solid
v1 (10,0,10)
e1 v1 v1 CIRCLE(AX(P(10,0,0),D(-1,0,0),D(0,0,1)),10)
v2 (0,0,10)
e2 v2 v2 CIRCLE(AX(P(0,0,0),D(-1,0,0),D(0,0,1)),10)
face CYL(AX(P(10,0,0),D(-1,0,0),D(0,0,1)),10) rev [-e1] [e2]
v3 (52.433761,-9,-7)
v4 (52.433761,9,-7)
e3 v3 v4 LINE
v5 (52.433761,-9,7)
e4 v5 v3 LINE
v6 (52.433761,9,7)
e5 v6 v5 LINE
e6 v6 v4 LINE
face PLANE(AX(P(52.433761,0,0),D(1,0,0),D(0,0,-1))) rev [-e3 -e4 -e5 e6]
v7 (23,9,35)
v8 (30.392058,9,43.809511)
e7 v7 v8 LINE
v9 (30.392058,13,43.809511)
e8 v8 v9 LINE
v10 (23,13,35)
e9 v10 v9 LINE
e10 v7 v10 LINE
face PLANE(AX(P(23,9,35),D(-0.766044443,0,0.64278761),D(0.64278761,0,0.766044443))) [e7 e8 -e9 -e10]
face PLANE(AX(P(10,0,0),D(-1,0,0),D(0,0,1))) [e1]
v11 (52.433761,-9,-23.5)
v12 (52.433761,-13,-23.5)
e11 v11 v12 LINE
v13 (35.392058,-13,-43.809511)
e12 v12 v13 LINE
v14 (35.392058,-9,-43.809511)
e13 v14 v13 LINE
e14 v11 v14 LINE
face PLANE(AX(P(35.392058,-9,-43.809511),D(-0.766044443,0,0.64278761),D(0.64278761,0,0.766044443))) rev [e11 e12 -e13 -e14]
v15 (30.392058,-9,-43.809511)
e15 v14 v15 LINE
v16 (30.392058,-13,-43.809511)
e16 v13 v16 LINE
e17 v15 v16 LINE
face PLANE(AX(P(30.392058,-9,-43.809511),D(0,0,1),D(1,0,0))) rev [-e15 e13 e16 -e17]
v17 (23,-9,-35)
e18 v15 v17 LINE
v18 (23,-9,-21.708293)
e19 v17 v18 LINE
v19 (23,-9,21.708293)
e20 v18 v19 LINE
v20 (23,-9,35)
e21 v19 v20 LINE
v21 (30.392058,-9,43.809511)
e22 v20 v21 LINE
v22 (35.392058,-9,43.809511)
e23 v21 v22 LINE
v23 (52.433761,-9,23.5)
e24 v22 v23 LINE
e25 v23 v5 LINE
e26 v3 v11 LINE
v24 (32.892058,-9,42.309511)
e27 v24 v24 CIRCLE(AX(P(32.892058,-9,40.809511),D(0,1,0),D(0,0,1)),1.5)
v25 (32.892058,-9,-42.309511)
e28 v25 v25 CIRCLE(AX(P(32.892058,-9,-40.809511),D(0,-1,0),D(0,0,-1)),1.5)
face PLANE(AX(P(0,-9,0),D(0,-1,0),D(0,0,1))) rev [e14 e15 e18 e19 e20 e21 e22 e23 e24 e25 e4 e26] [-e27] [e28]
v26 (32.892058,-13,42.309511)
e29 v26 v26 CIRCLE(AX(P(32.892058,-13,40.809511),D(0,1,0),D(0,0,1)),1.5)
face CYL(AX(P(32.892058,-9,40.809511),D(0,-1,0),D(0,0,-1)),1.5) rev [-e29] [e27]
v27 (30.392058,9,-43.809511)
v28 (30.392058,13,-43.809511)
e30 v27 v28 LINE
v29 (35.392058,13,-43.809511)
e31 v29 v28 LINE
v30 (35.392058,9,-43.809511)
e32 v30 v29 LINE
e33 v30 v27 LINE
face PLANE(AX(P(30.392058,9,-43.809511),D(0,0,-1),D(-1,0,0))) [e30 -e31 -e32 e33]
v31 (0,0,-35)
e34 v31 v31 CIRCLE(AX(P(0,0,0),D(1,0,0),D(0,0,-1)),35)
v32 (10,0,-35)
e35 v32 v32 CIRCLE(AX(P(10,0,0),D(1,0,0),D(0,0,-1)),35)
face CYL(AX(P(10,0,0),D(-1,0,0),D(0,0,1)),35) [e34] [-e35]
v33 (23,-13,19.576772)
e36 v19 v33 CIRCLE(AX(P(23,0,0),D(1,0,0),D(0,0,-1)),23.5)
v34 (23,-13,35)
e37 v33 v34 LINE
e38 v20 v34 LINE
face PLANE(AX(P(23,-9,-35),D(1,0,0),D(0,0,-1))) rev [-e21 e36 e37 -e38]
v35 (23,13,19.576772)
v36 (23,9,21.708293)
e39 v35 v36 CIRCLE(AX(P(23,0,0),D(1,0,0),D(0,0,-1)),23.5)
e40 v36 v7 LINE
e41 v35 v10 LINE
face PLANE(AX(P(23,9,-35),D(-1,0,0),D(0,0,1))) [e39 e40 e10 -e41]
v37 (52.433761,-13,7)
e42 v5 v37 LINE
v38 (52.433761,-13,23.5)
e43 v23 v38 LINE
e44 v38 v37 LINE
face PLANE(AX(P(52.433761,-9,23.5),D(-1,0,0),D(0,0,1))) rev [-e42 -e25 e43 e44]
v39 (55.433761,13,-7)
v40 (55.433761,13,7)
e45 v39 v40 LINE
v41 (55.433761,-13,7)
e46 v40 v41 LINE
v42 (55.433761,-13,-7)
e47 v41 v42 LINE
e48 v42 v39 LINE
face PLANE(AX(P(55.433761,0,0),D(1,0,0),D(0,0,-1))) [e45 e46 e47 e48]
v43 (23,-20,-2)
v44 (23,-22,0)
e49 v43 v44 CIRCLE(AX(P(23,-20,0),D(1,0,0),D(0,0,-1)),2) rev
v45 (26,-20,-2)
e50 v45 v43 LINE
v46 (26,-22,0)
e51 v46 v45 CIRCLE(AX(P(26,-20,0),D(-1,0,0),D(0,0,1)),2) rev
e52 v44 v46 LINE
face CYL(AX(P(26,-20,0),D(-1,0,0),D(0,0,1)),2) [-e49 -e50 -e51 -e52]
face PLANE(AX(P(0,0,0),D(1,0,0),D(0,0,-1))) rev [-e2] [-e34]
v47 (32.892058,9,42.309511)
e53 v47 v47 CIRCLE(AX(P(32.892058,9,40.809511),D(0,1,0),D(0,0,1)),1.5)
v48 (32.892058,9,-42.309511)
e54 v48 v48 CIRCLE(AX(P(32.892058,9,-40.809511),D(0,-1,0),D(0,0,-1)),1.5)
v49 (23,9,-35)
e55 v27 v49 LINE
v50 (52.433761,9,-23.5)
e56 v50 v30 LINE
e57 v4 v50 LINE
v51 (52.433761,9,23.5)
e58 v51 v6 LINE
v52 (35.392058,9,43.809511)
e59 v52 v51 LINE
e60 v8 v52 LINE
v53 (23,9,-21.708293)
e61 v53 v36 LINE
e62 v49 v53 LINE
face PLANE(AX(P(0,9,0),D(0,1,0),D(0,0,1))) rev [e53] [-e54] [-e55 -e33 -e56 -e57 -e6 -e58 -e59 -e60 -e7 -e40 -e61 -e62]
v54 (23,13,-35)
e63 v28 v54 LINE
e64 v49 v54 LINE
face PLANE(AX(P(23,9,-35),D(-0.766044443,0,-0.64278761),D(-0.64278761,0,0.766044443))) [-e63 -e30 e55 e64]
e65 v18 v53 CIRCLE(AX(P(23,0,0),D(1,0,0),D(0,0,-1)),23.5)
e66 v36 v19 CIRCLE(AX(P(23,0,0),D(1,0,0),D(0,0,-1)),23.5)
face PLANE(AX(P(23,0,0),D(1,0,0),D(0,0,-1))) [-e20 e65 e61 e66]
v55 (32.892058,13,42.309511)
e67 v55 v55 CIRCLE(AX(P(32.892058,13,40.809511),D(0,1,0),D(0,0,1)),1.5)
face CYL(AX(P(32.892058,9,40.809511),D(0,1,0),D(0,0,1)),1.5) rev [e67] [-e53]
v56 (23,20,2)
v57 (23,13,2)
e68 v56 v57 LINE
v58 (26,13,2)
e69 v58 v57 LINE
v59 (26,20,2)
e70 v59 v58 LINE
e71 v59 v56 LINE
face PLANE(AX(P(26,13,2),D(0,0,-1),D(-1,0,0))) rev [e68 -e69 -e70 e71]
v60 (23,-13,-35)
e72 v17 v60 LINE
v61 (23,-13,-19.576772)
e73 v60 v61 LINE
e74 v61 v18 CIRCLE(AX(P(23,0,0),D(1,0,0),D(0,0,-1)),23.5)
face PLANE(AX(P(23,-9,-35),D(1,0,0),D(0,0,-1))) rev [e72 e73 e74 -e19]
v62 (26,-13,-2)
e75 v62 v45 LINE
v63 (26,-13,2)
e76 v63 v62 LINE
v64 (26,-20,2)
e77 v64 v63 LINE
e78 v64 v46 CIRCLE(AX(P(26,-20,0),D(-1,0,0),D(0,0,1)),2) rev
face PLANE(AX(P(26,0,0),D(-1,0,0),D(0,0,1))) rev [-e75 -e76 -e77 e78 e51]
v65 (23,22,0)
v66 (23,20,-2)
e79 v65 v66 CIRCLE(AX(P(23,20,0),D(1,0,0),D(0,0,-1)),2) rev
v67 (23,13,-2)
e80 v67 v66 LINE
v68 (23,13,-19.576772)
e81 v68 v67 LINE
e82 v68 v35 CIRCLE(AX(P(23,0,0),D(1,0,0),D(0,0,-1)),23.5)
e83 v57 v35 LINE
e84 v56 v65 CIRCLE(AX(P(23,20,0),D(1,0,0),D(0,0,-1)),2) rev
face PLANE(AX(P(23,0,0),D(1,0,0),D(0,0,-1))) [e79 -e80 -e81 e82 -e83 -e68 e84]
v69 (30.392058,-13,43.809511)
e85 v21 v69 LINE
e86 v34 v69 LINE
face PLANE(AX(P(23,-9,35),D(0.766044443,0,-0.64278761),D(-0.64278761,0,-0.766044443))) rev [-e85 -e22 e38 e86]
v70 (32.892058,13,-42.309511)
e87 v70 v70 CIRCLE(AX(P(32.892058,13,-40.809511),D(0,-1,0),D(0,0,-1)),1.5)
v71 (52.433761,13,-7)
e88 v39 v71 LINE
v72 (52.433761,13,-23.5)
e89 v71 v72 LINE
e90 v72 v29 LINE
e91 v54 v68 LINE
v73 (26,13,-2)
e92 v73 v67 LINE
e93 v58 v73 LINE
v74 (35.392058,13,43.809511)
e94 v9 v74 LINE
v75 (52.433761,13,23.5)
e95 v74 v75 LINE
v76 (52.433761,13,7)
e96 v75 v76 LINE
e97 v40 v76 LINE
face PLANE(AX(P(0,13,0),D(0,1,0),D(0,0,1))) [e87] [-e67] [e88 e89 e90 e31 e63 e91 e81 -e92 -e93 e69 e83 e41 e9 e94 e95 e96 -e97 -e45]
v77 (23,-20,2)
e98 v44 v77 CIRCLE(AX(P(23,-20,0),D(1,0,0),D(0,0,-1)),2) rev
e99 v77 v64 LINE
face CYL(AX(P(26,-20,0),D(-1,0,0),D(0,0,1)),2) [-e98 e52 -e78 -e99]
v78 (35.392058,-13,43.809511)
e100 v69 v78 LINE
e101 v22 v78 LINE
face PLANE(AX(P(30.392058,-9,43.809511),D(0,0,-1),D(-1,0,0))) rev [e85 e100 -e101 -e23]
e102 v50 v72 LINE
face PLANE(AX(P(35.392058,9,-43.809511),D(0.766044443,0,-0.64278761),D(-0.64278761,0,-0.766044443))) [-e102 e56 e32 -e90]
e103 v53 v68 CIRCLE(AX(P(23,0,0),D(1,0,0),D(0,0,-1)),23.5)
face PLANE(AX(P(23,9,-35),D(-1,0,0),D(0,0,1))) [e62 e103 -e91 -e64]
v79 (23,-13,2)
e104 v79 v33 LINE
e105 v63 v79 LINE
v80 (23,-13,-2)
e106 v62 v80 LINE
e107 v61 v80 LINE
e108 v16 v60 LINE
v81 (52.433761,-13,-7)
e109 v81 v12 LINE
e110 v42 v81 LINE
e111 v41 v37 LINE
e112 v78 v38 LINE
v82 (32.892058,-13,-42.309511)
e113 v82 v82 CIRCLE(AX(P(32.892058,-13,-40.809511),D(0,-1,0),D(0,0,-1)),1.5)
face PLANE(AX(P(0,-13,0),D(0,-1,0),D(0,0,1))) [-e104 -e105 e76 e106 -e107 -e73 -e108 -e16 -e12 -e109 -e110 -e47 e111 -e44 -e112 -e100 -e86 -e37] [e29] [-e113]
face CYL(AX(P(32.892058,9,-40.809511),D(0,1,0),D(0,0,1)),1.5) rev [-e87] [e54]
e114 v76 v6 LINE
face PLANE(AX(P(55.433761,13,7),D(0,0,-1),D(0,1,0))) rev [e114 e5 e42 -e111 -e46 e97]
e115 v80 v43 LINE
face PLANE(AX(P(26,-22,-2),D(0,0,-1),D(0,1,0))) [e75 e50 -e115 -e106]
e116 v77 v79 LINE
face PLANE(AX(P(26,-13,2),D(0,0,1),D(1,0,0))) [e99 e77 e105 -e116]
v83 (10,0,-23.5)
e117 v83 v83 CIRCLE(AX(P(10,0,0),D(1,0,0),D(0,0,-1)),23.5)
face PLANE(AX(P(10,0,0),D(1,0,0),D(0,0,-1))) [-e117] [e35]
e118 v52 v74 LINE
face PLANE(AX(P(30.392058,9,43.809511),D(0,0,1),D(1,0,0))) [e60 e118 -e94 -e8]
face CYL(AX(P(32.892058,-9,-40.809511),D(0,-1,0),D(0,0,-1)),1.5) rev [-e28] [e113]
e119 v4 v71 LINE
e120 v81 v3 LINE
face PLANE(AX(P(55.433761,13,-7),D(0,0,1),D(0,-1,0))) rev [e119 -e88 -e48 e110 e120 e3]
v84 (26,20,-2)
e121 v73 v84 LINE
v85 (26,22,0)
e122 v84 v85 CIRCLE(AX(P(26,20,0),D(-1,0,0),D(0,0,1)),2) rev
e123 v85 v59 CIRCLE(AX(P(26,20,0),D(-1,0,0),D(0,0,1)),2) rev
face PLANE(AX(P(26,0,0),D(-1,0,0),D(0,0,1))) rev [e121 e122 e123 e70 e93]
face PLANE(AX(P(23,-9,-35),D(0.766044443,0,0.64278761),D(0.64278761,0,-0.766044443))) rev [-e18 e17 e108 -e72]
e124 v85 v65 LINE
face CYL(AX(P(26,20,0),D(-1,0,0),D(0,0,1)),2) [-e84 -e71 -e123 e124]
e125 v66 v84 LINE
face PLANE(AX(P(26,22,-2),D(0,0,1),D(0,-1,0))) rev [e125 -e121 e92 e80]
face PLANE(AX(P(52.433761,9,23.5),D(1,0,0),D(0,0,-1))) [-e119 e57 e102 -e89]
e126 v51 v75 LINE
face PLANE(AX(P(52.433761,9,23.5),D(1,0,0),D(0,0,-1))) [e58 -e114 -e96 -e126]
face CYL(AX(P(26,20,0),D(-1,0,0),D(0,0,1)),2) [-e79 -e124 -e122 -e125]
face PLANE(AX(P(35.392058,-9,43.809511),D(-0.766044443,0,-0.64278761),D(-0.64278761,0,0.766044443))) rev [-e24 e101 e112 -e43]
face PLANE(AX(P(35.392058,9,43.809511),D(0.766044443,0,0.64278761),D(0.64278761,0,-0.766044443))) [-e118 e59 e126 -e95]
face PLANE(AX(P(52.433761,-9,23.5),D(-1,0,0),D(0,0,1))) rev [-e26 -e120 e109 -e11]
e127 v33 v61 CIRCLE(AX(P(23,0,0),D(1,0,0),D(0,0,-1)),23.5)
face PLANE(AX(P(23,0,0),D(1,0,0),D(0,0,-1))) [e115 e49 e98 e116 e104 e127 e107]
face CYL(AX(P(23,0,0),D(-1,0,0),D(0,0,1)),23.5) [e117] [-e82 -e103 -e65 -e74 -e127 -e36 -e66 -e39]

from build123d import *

# Parameters (mm, degrees)
SKETCH1_R               = 35
BOSS_EXTRUDE1_DEPTH     = 10
SKETCH2_R               = 23.5
BOSS_EXTRUDE2_DEPTH     = 13
BOSS_EXTRUDE3_DEPTH     = 4
SKETCH4_R               = 1.5
CUT_EXTRUDE1_DEPTH      = 4
MIRROR2_COPY_1_SKETCH_R = 1.5
MIRROR2_COPY_1_DEPTH    = 4
BOSS_EXTRUDE4_DEPTH     = 3
FILLET1_R               = 2
FILLET1_OF_MIRROR3_R    = 2
SKETCH6_W               = 14
SKETCH6_H               = 26
BOSS_EXTRUDE5_DEPTH     = 3
SKETCH7_R               = 10
CUT_EXTRUDE2_DEPTH      = 10


with BuildPart() as part:
    # Sketch1 → Boss-Extrude1 (new body)
    with BuildSketch(Plane(origin=(0, 0, 0), x_dir=(0, 0, -1), z_dir=(1, 0, 0))):
        Circle(SKETCH1_R)
    extrude(amount=BOSS_EXTRUDE1_DEPTH)

    # Sketch2 → Boss-Extrude2 (add)
    with BuildSketch(Plane(origin=(10, 0, 0), x_dir=(0, 0, -1), z_dir=(1, 0, 0))):
        with Locations(Location((0, 0, 0), (0, 0, 180))):
            Circle(SKETCH2_R)
    extrude(amount=BOSS_EXTRUDE2_DEPTH)

    # Sketch3 → Boss-Extrude3 (add)
    with BuildSketch(Plane(origin=(0, 13, 0), x_dir=(1, 0, 0), z_dir=(0, 1, 0))):
        Polygon((23, 35), (23, -35), (30.392057511, -43.809511096), (35.392057511, -43.809511096), (52.433760781, -23.5), (52.433760781, 23.5), (35.392057511, 43.809511096), (30.392057511, 43.809511096), align=None)
    boss_extrude3 = extrude(amount=-BOSS_EXTRUDE3_DEPTH)

    # Sketch4 → Cut-Extrude1 (cut)
    with BuildSketch(Plane(origin=(0, 13, 0), x_dir=(1, 0, 0), z_dir=(0, 1, 0))):
        with Locations(Location((32.892057511, -40.809511096, 0), (0, 0, 270))):
            Circle(SKETCH4_R)
    cut_extrude1 = extrude(amount=-CUT_EXTRUDE1_DEPTH, mode=Mode.SUBTRACT)

    # Mirror1: Cut-Extrude1 across plane
    add(cut_extrude1.mirror(Plane.XY), mode=Mode.SUBTRACT)

    # Mirror2: Boss-Extrude3, Cut-Extrude1 across plane
    add(boss_extrude3.mirror(Plane.ZX))
    add(cut_extrude1.mirror(Plane.ZX), mode=Mode.SUBTRACT)

    # Mirror2 copy 1 sketch → Mirror2 copy 1 (cut)
    with BuildSketch(Plane.XZ.offset(13)):
        with Locations(Location((32.892057511, -40.809511096, 0), (0, 0, 270))):
            Circle(MIRROR2_COPY_1_SKETCH_R)
    extrude(amount=-MIRROR2_COPY_1_DEPTH, mode=Mode.SUBTRACT)

    # Sketch5 → Boss-Extrude4 (add)
    with BuildSketch(Plane(origin=(23, 0, 0), x_dir=(0, 0, -1), z_dir=(1, 0, 0))):
        Polygon((0, 13), (-2, 13), (-2, 22), (2, 22), (2, 13), align=None)
    boss_extrude4 = extrude(amount=BOSS_EXTRUDE4_DEPTH)

    # Fillet1
    fillet1_edges = [part.edges().sort_by_distance(p)[0] for p in [
        (24.5, 22, 2),
        (24.5, 22, -2),
    ]]
    fillet(fillet1_edges, radius=FILLET1_R - 0.0001)  # a hair under: the kernel refuses the full size

    # Mirror3: Boss-Extrude4 across plane
    add(boss_extrude4.mirror(Plane.ZX))

    # Fillet1 of Mirror3
    fillet1_of_mirror3_edges = [part.edges().sort_by_distance(p)[0] for p in [
        (24.5, -22, 2),
        (24.5, -22, -2),
    ]]
    fillet(fillet1_of_mirror3_edges, radius=FILLET1_OF_MIRROR3_R - 0.0001)  # a hair under: the kernel refuses the full size

    # Sketch6 → Boss-Extrude5 (add)
    with BuildSketch(Plane(origin=(52.433760781, 0, 0), x_dir=(0, 0, -1), z_dir=(1, 0, 0))):
        Rectangle(SKETCH6_W, SKETCH6_H)
    extrude(amount=BOSS_EXTRUDE5_DEPTH)

    # Sketch7 → Cut-Extrude2 (cut)
    with BuildSketch(Plane.ZY):
        Circle(SKETCH7_R)
    extrude(amount=-CUT_EXTRUDE2_DEPTH, mode=Mode.SUBTRACT)


solid = part.part
